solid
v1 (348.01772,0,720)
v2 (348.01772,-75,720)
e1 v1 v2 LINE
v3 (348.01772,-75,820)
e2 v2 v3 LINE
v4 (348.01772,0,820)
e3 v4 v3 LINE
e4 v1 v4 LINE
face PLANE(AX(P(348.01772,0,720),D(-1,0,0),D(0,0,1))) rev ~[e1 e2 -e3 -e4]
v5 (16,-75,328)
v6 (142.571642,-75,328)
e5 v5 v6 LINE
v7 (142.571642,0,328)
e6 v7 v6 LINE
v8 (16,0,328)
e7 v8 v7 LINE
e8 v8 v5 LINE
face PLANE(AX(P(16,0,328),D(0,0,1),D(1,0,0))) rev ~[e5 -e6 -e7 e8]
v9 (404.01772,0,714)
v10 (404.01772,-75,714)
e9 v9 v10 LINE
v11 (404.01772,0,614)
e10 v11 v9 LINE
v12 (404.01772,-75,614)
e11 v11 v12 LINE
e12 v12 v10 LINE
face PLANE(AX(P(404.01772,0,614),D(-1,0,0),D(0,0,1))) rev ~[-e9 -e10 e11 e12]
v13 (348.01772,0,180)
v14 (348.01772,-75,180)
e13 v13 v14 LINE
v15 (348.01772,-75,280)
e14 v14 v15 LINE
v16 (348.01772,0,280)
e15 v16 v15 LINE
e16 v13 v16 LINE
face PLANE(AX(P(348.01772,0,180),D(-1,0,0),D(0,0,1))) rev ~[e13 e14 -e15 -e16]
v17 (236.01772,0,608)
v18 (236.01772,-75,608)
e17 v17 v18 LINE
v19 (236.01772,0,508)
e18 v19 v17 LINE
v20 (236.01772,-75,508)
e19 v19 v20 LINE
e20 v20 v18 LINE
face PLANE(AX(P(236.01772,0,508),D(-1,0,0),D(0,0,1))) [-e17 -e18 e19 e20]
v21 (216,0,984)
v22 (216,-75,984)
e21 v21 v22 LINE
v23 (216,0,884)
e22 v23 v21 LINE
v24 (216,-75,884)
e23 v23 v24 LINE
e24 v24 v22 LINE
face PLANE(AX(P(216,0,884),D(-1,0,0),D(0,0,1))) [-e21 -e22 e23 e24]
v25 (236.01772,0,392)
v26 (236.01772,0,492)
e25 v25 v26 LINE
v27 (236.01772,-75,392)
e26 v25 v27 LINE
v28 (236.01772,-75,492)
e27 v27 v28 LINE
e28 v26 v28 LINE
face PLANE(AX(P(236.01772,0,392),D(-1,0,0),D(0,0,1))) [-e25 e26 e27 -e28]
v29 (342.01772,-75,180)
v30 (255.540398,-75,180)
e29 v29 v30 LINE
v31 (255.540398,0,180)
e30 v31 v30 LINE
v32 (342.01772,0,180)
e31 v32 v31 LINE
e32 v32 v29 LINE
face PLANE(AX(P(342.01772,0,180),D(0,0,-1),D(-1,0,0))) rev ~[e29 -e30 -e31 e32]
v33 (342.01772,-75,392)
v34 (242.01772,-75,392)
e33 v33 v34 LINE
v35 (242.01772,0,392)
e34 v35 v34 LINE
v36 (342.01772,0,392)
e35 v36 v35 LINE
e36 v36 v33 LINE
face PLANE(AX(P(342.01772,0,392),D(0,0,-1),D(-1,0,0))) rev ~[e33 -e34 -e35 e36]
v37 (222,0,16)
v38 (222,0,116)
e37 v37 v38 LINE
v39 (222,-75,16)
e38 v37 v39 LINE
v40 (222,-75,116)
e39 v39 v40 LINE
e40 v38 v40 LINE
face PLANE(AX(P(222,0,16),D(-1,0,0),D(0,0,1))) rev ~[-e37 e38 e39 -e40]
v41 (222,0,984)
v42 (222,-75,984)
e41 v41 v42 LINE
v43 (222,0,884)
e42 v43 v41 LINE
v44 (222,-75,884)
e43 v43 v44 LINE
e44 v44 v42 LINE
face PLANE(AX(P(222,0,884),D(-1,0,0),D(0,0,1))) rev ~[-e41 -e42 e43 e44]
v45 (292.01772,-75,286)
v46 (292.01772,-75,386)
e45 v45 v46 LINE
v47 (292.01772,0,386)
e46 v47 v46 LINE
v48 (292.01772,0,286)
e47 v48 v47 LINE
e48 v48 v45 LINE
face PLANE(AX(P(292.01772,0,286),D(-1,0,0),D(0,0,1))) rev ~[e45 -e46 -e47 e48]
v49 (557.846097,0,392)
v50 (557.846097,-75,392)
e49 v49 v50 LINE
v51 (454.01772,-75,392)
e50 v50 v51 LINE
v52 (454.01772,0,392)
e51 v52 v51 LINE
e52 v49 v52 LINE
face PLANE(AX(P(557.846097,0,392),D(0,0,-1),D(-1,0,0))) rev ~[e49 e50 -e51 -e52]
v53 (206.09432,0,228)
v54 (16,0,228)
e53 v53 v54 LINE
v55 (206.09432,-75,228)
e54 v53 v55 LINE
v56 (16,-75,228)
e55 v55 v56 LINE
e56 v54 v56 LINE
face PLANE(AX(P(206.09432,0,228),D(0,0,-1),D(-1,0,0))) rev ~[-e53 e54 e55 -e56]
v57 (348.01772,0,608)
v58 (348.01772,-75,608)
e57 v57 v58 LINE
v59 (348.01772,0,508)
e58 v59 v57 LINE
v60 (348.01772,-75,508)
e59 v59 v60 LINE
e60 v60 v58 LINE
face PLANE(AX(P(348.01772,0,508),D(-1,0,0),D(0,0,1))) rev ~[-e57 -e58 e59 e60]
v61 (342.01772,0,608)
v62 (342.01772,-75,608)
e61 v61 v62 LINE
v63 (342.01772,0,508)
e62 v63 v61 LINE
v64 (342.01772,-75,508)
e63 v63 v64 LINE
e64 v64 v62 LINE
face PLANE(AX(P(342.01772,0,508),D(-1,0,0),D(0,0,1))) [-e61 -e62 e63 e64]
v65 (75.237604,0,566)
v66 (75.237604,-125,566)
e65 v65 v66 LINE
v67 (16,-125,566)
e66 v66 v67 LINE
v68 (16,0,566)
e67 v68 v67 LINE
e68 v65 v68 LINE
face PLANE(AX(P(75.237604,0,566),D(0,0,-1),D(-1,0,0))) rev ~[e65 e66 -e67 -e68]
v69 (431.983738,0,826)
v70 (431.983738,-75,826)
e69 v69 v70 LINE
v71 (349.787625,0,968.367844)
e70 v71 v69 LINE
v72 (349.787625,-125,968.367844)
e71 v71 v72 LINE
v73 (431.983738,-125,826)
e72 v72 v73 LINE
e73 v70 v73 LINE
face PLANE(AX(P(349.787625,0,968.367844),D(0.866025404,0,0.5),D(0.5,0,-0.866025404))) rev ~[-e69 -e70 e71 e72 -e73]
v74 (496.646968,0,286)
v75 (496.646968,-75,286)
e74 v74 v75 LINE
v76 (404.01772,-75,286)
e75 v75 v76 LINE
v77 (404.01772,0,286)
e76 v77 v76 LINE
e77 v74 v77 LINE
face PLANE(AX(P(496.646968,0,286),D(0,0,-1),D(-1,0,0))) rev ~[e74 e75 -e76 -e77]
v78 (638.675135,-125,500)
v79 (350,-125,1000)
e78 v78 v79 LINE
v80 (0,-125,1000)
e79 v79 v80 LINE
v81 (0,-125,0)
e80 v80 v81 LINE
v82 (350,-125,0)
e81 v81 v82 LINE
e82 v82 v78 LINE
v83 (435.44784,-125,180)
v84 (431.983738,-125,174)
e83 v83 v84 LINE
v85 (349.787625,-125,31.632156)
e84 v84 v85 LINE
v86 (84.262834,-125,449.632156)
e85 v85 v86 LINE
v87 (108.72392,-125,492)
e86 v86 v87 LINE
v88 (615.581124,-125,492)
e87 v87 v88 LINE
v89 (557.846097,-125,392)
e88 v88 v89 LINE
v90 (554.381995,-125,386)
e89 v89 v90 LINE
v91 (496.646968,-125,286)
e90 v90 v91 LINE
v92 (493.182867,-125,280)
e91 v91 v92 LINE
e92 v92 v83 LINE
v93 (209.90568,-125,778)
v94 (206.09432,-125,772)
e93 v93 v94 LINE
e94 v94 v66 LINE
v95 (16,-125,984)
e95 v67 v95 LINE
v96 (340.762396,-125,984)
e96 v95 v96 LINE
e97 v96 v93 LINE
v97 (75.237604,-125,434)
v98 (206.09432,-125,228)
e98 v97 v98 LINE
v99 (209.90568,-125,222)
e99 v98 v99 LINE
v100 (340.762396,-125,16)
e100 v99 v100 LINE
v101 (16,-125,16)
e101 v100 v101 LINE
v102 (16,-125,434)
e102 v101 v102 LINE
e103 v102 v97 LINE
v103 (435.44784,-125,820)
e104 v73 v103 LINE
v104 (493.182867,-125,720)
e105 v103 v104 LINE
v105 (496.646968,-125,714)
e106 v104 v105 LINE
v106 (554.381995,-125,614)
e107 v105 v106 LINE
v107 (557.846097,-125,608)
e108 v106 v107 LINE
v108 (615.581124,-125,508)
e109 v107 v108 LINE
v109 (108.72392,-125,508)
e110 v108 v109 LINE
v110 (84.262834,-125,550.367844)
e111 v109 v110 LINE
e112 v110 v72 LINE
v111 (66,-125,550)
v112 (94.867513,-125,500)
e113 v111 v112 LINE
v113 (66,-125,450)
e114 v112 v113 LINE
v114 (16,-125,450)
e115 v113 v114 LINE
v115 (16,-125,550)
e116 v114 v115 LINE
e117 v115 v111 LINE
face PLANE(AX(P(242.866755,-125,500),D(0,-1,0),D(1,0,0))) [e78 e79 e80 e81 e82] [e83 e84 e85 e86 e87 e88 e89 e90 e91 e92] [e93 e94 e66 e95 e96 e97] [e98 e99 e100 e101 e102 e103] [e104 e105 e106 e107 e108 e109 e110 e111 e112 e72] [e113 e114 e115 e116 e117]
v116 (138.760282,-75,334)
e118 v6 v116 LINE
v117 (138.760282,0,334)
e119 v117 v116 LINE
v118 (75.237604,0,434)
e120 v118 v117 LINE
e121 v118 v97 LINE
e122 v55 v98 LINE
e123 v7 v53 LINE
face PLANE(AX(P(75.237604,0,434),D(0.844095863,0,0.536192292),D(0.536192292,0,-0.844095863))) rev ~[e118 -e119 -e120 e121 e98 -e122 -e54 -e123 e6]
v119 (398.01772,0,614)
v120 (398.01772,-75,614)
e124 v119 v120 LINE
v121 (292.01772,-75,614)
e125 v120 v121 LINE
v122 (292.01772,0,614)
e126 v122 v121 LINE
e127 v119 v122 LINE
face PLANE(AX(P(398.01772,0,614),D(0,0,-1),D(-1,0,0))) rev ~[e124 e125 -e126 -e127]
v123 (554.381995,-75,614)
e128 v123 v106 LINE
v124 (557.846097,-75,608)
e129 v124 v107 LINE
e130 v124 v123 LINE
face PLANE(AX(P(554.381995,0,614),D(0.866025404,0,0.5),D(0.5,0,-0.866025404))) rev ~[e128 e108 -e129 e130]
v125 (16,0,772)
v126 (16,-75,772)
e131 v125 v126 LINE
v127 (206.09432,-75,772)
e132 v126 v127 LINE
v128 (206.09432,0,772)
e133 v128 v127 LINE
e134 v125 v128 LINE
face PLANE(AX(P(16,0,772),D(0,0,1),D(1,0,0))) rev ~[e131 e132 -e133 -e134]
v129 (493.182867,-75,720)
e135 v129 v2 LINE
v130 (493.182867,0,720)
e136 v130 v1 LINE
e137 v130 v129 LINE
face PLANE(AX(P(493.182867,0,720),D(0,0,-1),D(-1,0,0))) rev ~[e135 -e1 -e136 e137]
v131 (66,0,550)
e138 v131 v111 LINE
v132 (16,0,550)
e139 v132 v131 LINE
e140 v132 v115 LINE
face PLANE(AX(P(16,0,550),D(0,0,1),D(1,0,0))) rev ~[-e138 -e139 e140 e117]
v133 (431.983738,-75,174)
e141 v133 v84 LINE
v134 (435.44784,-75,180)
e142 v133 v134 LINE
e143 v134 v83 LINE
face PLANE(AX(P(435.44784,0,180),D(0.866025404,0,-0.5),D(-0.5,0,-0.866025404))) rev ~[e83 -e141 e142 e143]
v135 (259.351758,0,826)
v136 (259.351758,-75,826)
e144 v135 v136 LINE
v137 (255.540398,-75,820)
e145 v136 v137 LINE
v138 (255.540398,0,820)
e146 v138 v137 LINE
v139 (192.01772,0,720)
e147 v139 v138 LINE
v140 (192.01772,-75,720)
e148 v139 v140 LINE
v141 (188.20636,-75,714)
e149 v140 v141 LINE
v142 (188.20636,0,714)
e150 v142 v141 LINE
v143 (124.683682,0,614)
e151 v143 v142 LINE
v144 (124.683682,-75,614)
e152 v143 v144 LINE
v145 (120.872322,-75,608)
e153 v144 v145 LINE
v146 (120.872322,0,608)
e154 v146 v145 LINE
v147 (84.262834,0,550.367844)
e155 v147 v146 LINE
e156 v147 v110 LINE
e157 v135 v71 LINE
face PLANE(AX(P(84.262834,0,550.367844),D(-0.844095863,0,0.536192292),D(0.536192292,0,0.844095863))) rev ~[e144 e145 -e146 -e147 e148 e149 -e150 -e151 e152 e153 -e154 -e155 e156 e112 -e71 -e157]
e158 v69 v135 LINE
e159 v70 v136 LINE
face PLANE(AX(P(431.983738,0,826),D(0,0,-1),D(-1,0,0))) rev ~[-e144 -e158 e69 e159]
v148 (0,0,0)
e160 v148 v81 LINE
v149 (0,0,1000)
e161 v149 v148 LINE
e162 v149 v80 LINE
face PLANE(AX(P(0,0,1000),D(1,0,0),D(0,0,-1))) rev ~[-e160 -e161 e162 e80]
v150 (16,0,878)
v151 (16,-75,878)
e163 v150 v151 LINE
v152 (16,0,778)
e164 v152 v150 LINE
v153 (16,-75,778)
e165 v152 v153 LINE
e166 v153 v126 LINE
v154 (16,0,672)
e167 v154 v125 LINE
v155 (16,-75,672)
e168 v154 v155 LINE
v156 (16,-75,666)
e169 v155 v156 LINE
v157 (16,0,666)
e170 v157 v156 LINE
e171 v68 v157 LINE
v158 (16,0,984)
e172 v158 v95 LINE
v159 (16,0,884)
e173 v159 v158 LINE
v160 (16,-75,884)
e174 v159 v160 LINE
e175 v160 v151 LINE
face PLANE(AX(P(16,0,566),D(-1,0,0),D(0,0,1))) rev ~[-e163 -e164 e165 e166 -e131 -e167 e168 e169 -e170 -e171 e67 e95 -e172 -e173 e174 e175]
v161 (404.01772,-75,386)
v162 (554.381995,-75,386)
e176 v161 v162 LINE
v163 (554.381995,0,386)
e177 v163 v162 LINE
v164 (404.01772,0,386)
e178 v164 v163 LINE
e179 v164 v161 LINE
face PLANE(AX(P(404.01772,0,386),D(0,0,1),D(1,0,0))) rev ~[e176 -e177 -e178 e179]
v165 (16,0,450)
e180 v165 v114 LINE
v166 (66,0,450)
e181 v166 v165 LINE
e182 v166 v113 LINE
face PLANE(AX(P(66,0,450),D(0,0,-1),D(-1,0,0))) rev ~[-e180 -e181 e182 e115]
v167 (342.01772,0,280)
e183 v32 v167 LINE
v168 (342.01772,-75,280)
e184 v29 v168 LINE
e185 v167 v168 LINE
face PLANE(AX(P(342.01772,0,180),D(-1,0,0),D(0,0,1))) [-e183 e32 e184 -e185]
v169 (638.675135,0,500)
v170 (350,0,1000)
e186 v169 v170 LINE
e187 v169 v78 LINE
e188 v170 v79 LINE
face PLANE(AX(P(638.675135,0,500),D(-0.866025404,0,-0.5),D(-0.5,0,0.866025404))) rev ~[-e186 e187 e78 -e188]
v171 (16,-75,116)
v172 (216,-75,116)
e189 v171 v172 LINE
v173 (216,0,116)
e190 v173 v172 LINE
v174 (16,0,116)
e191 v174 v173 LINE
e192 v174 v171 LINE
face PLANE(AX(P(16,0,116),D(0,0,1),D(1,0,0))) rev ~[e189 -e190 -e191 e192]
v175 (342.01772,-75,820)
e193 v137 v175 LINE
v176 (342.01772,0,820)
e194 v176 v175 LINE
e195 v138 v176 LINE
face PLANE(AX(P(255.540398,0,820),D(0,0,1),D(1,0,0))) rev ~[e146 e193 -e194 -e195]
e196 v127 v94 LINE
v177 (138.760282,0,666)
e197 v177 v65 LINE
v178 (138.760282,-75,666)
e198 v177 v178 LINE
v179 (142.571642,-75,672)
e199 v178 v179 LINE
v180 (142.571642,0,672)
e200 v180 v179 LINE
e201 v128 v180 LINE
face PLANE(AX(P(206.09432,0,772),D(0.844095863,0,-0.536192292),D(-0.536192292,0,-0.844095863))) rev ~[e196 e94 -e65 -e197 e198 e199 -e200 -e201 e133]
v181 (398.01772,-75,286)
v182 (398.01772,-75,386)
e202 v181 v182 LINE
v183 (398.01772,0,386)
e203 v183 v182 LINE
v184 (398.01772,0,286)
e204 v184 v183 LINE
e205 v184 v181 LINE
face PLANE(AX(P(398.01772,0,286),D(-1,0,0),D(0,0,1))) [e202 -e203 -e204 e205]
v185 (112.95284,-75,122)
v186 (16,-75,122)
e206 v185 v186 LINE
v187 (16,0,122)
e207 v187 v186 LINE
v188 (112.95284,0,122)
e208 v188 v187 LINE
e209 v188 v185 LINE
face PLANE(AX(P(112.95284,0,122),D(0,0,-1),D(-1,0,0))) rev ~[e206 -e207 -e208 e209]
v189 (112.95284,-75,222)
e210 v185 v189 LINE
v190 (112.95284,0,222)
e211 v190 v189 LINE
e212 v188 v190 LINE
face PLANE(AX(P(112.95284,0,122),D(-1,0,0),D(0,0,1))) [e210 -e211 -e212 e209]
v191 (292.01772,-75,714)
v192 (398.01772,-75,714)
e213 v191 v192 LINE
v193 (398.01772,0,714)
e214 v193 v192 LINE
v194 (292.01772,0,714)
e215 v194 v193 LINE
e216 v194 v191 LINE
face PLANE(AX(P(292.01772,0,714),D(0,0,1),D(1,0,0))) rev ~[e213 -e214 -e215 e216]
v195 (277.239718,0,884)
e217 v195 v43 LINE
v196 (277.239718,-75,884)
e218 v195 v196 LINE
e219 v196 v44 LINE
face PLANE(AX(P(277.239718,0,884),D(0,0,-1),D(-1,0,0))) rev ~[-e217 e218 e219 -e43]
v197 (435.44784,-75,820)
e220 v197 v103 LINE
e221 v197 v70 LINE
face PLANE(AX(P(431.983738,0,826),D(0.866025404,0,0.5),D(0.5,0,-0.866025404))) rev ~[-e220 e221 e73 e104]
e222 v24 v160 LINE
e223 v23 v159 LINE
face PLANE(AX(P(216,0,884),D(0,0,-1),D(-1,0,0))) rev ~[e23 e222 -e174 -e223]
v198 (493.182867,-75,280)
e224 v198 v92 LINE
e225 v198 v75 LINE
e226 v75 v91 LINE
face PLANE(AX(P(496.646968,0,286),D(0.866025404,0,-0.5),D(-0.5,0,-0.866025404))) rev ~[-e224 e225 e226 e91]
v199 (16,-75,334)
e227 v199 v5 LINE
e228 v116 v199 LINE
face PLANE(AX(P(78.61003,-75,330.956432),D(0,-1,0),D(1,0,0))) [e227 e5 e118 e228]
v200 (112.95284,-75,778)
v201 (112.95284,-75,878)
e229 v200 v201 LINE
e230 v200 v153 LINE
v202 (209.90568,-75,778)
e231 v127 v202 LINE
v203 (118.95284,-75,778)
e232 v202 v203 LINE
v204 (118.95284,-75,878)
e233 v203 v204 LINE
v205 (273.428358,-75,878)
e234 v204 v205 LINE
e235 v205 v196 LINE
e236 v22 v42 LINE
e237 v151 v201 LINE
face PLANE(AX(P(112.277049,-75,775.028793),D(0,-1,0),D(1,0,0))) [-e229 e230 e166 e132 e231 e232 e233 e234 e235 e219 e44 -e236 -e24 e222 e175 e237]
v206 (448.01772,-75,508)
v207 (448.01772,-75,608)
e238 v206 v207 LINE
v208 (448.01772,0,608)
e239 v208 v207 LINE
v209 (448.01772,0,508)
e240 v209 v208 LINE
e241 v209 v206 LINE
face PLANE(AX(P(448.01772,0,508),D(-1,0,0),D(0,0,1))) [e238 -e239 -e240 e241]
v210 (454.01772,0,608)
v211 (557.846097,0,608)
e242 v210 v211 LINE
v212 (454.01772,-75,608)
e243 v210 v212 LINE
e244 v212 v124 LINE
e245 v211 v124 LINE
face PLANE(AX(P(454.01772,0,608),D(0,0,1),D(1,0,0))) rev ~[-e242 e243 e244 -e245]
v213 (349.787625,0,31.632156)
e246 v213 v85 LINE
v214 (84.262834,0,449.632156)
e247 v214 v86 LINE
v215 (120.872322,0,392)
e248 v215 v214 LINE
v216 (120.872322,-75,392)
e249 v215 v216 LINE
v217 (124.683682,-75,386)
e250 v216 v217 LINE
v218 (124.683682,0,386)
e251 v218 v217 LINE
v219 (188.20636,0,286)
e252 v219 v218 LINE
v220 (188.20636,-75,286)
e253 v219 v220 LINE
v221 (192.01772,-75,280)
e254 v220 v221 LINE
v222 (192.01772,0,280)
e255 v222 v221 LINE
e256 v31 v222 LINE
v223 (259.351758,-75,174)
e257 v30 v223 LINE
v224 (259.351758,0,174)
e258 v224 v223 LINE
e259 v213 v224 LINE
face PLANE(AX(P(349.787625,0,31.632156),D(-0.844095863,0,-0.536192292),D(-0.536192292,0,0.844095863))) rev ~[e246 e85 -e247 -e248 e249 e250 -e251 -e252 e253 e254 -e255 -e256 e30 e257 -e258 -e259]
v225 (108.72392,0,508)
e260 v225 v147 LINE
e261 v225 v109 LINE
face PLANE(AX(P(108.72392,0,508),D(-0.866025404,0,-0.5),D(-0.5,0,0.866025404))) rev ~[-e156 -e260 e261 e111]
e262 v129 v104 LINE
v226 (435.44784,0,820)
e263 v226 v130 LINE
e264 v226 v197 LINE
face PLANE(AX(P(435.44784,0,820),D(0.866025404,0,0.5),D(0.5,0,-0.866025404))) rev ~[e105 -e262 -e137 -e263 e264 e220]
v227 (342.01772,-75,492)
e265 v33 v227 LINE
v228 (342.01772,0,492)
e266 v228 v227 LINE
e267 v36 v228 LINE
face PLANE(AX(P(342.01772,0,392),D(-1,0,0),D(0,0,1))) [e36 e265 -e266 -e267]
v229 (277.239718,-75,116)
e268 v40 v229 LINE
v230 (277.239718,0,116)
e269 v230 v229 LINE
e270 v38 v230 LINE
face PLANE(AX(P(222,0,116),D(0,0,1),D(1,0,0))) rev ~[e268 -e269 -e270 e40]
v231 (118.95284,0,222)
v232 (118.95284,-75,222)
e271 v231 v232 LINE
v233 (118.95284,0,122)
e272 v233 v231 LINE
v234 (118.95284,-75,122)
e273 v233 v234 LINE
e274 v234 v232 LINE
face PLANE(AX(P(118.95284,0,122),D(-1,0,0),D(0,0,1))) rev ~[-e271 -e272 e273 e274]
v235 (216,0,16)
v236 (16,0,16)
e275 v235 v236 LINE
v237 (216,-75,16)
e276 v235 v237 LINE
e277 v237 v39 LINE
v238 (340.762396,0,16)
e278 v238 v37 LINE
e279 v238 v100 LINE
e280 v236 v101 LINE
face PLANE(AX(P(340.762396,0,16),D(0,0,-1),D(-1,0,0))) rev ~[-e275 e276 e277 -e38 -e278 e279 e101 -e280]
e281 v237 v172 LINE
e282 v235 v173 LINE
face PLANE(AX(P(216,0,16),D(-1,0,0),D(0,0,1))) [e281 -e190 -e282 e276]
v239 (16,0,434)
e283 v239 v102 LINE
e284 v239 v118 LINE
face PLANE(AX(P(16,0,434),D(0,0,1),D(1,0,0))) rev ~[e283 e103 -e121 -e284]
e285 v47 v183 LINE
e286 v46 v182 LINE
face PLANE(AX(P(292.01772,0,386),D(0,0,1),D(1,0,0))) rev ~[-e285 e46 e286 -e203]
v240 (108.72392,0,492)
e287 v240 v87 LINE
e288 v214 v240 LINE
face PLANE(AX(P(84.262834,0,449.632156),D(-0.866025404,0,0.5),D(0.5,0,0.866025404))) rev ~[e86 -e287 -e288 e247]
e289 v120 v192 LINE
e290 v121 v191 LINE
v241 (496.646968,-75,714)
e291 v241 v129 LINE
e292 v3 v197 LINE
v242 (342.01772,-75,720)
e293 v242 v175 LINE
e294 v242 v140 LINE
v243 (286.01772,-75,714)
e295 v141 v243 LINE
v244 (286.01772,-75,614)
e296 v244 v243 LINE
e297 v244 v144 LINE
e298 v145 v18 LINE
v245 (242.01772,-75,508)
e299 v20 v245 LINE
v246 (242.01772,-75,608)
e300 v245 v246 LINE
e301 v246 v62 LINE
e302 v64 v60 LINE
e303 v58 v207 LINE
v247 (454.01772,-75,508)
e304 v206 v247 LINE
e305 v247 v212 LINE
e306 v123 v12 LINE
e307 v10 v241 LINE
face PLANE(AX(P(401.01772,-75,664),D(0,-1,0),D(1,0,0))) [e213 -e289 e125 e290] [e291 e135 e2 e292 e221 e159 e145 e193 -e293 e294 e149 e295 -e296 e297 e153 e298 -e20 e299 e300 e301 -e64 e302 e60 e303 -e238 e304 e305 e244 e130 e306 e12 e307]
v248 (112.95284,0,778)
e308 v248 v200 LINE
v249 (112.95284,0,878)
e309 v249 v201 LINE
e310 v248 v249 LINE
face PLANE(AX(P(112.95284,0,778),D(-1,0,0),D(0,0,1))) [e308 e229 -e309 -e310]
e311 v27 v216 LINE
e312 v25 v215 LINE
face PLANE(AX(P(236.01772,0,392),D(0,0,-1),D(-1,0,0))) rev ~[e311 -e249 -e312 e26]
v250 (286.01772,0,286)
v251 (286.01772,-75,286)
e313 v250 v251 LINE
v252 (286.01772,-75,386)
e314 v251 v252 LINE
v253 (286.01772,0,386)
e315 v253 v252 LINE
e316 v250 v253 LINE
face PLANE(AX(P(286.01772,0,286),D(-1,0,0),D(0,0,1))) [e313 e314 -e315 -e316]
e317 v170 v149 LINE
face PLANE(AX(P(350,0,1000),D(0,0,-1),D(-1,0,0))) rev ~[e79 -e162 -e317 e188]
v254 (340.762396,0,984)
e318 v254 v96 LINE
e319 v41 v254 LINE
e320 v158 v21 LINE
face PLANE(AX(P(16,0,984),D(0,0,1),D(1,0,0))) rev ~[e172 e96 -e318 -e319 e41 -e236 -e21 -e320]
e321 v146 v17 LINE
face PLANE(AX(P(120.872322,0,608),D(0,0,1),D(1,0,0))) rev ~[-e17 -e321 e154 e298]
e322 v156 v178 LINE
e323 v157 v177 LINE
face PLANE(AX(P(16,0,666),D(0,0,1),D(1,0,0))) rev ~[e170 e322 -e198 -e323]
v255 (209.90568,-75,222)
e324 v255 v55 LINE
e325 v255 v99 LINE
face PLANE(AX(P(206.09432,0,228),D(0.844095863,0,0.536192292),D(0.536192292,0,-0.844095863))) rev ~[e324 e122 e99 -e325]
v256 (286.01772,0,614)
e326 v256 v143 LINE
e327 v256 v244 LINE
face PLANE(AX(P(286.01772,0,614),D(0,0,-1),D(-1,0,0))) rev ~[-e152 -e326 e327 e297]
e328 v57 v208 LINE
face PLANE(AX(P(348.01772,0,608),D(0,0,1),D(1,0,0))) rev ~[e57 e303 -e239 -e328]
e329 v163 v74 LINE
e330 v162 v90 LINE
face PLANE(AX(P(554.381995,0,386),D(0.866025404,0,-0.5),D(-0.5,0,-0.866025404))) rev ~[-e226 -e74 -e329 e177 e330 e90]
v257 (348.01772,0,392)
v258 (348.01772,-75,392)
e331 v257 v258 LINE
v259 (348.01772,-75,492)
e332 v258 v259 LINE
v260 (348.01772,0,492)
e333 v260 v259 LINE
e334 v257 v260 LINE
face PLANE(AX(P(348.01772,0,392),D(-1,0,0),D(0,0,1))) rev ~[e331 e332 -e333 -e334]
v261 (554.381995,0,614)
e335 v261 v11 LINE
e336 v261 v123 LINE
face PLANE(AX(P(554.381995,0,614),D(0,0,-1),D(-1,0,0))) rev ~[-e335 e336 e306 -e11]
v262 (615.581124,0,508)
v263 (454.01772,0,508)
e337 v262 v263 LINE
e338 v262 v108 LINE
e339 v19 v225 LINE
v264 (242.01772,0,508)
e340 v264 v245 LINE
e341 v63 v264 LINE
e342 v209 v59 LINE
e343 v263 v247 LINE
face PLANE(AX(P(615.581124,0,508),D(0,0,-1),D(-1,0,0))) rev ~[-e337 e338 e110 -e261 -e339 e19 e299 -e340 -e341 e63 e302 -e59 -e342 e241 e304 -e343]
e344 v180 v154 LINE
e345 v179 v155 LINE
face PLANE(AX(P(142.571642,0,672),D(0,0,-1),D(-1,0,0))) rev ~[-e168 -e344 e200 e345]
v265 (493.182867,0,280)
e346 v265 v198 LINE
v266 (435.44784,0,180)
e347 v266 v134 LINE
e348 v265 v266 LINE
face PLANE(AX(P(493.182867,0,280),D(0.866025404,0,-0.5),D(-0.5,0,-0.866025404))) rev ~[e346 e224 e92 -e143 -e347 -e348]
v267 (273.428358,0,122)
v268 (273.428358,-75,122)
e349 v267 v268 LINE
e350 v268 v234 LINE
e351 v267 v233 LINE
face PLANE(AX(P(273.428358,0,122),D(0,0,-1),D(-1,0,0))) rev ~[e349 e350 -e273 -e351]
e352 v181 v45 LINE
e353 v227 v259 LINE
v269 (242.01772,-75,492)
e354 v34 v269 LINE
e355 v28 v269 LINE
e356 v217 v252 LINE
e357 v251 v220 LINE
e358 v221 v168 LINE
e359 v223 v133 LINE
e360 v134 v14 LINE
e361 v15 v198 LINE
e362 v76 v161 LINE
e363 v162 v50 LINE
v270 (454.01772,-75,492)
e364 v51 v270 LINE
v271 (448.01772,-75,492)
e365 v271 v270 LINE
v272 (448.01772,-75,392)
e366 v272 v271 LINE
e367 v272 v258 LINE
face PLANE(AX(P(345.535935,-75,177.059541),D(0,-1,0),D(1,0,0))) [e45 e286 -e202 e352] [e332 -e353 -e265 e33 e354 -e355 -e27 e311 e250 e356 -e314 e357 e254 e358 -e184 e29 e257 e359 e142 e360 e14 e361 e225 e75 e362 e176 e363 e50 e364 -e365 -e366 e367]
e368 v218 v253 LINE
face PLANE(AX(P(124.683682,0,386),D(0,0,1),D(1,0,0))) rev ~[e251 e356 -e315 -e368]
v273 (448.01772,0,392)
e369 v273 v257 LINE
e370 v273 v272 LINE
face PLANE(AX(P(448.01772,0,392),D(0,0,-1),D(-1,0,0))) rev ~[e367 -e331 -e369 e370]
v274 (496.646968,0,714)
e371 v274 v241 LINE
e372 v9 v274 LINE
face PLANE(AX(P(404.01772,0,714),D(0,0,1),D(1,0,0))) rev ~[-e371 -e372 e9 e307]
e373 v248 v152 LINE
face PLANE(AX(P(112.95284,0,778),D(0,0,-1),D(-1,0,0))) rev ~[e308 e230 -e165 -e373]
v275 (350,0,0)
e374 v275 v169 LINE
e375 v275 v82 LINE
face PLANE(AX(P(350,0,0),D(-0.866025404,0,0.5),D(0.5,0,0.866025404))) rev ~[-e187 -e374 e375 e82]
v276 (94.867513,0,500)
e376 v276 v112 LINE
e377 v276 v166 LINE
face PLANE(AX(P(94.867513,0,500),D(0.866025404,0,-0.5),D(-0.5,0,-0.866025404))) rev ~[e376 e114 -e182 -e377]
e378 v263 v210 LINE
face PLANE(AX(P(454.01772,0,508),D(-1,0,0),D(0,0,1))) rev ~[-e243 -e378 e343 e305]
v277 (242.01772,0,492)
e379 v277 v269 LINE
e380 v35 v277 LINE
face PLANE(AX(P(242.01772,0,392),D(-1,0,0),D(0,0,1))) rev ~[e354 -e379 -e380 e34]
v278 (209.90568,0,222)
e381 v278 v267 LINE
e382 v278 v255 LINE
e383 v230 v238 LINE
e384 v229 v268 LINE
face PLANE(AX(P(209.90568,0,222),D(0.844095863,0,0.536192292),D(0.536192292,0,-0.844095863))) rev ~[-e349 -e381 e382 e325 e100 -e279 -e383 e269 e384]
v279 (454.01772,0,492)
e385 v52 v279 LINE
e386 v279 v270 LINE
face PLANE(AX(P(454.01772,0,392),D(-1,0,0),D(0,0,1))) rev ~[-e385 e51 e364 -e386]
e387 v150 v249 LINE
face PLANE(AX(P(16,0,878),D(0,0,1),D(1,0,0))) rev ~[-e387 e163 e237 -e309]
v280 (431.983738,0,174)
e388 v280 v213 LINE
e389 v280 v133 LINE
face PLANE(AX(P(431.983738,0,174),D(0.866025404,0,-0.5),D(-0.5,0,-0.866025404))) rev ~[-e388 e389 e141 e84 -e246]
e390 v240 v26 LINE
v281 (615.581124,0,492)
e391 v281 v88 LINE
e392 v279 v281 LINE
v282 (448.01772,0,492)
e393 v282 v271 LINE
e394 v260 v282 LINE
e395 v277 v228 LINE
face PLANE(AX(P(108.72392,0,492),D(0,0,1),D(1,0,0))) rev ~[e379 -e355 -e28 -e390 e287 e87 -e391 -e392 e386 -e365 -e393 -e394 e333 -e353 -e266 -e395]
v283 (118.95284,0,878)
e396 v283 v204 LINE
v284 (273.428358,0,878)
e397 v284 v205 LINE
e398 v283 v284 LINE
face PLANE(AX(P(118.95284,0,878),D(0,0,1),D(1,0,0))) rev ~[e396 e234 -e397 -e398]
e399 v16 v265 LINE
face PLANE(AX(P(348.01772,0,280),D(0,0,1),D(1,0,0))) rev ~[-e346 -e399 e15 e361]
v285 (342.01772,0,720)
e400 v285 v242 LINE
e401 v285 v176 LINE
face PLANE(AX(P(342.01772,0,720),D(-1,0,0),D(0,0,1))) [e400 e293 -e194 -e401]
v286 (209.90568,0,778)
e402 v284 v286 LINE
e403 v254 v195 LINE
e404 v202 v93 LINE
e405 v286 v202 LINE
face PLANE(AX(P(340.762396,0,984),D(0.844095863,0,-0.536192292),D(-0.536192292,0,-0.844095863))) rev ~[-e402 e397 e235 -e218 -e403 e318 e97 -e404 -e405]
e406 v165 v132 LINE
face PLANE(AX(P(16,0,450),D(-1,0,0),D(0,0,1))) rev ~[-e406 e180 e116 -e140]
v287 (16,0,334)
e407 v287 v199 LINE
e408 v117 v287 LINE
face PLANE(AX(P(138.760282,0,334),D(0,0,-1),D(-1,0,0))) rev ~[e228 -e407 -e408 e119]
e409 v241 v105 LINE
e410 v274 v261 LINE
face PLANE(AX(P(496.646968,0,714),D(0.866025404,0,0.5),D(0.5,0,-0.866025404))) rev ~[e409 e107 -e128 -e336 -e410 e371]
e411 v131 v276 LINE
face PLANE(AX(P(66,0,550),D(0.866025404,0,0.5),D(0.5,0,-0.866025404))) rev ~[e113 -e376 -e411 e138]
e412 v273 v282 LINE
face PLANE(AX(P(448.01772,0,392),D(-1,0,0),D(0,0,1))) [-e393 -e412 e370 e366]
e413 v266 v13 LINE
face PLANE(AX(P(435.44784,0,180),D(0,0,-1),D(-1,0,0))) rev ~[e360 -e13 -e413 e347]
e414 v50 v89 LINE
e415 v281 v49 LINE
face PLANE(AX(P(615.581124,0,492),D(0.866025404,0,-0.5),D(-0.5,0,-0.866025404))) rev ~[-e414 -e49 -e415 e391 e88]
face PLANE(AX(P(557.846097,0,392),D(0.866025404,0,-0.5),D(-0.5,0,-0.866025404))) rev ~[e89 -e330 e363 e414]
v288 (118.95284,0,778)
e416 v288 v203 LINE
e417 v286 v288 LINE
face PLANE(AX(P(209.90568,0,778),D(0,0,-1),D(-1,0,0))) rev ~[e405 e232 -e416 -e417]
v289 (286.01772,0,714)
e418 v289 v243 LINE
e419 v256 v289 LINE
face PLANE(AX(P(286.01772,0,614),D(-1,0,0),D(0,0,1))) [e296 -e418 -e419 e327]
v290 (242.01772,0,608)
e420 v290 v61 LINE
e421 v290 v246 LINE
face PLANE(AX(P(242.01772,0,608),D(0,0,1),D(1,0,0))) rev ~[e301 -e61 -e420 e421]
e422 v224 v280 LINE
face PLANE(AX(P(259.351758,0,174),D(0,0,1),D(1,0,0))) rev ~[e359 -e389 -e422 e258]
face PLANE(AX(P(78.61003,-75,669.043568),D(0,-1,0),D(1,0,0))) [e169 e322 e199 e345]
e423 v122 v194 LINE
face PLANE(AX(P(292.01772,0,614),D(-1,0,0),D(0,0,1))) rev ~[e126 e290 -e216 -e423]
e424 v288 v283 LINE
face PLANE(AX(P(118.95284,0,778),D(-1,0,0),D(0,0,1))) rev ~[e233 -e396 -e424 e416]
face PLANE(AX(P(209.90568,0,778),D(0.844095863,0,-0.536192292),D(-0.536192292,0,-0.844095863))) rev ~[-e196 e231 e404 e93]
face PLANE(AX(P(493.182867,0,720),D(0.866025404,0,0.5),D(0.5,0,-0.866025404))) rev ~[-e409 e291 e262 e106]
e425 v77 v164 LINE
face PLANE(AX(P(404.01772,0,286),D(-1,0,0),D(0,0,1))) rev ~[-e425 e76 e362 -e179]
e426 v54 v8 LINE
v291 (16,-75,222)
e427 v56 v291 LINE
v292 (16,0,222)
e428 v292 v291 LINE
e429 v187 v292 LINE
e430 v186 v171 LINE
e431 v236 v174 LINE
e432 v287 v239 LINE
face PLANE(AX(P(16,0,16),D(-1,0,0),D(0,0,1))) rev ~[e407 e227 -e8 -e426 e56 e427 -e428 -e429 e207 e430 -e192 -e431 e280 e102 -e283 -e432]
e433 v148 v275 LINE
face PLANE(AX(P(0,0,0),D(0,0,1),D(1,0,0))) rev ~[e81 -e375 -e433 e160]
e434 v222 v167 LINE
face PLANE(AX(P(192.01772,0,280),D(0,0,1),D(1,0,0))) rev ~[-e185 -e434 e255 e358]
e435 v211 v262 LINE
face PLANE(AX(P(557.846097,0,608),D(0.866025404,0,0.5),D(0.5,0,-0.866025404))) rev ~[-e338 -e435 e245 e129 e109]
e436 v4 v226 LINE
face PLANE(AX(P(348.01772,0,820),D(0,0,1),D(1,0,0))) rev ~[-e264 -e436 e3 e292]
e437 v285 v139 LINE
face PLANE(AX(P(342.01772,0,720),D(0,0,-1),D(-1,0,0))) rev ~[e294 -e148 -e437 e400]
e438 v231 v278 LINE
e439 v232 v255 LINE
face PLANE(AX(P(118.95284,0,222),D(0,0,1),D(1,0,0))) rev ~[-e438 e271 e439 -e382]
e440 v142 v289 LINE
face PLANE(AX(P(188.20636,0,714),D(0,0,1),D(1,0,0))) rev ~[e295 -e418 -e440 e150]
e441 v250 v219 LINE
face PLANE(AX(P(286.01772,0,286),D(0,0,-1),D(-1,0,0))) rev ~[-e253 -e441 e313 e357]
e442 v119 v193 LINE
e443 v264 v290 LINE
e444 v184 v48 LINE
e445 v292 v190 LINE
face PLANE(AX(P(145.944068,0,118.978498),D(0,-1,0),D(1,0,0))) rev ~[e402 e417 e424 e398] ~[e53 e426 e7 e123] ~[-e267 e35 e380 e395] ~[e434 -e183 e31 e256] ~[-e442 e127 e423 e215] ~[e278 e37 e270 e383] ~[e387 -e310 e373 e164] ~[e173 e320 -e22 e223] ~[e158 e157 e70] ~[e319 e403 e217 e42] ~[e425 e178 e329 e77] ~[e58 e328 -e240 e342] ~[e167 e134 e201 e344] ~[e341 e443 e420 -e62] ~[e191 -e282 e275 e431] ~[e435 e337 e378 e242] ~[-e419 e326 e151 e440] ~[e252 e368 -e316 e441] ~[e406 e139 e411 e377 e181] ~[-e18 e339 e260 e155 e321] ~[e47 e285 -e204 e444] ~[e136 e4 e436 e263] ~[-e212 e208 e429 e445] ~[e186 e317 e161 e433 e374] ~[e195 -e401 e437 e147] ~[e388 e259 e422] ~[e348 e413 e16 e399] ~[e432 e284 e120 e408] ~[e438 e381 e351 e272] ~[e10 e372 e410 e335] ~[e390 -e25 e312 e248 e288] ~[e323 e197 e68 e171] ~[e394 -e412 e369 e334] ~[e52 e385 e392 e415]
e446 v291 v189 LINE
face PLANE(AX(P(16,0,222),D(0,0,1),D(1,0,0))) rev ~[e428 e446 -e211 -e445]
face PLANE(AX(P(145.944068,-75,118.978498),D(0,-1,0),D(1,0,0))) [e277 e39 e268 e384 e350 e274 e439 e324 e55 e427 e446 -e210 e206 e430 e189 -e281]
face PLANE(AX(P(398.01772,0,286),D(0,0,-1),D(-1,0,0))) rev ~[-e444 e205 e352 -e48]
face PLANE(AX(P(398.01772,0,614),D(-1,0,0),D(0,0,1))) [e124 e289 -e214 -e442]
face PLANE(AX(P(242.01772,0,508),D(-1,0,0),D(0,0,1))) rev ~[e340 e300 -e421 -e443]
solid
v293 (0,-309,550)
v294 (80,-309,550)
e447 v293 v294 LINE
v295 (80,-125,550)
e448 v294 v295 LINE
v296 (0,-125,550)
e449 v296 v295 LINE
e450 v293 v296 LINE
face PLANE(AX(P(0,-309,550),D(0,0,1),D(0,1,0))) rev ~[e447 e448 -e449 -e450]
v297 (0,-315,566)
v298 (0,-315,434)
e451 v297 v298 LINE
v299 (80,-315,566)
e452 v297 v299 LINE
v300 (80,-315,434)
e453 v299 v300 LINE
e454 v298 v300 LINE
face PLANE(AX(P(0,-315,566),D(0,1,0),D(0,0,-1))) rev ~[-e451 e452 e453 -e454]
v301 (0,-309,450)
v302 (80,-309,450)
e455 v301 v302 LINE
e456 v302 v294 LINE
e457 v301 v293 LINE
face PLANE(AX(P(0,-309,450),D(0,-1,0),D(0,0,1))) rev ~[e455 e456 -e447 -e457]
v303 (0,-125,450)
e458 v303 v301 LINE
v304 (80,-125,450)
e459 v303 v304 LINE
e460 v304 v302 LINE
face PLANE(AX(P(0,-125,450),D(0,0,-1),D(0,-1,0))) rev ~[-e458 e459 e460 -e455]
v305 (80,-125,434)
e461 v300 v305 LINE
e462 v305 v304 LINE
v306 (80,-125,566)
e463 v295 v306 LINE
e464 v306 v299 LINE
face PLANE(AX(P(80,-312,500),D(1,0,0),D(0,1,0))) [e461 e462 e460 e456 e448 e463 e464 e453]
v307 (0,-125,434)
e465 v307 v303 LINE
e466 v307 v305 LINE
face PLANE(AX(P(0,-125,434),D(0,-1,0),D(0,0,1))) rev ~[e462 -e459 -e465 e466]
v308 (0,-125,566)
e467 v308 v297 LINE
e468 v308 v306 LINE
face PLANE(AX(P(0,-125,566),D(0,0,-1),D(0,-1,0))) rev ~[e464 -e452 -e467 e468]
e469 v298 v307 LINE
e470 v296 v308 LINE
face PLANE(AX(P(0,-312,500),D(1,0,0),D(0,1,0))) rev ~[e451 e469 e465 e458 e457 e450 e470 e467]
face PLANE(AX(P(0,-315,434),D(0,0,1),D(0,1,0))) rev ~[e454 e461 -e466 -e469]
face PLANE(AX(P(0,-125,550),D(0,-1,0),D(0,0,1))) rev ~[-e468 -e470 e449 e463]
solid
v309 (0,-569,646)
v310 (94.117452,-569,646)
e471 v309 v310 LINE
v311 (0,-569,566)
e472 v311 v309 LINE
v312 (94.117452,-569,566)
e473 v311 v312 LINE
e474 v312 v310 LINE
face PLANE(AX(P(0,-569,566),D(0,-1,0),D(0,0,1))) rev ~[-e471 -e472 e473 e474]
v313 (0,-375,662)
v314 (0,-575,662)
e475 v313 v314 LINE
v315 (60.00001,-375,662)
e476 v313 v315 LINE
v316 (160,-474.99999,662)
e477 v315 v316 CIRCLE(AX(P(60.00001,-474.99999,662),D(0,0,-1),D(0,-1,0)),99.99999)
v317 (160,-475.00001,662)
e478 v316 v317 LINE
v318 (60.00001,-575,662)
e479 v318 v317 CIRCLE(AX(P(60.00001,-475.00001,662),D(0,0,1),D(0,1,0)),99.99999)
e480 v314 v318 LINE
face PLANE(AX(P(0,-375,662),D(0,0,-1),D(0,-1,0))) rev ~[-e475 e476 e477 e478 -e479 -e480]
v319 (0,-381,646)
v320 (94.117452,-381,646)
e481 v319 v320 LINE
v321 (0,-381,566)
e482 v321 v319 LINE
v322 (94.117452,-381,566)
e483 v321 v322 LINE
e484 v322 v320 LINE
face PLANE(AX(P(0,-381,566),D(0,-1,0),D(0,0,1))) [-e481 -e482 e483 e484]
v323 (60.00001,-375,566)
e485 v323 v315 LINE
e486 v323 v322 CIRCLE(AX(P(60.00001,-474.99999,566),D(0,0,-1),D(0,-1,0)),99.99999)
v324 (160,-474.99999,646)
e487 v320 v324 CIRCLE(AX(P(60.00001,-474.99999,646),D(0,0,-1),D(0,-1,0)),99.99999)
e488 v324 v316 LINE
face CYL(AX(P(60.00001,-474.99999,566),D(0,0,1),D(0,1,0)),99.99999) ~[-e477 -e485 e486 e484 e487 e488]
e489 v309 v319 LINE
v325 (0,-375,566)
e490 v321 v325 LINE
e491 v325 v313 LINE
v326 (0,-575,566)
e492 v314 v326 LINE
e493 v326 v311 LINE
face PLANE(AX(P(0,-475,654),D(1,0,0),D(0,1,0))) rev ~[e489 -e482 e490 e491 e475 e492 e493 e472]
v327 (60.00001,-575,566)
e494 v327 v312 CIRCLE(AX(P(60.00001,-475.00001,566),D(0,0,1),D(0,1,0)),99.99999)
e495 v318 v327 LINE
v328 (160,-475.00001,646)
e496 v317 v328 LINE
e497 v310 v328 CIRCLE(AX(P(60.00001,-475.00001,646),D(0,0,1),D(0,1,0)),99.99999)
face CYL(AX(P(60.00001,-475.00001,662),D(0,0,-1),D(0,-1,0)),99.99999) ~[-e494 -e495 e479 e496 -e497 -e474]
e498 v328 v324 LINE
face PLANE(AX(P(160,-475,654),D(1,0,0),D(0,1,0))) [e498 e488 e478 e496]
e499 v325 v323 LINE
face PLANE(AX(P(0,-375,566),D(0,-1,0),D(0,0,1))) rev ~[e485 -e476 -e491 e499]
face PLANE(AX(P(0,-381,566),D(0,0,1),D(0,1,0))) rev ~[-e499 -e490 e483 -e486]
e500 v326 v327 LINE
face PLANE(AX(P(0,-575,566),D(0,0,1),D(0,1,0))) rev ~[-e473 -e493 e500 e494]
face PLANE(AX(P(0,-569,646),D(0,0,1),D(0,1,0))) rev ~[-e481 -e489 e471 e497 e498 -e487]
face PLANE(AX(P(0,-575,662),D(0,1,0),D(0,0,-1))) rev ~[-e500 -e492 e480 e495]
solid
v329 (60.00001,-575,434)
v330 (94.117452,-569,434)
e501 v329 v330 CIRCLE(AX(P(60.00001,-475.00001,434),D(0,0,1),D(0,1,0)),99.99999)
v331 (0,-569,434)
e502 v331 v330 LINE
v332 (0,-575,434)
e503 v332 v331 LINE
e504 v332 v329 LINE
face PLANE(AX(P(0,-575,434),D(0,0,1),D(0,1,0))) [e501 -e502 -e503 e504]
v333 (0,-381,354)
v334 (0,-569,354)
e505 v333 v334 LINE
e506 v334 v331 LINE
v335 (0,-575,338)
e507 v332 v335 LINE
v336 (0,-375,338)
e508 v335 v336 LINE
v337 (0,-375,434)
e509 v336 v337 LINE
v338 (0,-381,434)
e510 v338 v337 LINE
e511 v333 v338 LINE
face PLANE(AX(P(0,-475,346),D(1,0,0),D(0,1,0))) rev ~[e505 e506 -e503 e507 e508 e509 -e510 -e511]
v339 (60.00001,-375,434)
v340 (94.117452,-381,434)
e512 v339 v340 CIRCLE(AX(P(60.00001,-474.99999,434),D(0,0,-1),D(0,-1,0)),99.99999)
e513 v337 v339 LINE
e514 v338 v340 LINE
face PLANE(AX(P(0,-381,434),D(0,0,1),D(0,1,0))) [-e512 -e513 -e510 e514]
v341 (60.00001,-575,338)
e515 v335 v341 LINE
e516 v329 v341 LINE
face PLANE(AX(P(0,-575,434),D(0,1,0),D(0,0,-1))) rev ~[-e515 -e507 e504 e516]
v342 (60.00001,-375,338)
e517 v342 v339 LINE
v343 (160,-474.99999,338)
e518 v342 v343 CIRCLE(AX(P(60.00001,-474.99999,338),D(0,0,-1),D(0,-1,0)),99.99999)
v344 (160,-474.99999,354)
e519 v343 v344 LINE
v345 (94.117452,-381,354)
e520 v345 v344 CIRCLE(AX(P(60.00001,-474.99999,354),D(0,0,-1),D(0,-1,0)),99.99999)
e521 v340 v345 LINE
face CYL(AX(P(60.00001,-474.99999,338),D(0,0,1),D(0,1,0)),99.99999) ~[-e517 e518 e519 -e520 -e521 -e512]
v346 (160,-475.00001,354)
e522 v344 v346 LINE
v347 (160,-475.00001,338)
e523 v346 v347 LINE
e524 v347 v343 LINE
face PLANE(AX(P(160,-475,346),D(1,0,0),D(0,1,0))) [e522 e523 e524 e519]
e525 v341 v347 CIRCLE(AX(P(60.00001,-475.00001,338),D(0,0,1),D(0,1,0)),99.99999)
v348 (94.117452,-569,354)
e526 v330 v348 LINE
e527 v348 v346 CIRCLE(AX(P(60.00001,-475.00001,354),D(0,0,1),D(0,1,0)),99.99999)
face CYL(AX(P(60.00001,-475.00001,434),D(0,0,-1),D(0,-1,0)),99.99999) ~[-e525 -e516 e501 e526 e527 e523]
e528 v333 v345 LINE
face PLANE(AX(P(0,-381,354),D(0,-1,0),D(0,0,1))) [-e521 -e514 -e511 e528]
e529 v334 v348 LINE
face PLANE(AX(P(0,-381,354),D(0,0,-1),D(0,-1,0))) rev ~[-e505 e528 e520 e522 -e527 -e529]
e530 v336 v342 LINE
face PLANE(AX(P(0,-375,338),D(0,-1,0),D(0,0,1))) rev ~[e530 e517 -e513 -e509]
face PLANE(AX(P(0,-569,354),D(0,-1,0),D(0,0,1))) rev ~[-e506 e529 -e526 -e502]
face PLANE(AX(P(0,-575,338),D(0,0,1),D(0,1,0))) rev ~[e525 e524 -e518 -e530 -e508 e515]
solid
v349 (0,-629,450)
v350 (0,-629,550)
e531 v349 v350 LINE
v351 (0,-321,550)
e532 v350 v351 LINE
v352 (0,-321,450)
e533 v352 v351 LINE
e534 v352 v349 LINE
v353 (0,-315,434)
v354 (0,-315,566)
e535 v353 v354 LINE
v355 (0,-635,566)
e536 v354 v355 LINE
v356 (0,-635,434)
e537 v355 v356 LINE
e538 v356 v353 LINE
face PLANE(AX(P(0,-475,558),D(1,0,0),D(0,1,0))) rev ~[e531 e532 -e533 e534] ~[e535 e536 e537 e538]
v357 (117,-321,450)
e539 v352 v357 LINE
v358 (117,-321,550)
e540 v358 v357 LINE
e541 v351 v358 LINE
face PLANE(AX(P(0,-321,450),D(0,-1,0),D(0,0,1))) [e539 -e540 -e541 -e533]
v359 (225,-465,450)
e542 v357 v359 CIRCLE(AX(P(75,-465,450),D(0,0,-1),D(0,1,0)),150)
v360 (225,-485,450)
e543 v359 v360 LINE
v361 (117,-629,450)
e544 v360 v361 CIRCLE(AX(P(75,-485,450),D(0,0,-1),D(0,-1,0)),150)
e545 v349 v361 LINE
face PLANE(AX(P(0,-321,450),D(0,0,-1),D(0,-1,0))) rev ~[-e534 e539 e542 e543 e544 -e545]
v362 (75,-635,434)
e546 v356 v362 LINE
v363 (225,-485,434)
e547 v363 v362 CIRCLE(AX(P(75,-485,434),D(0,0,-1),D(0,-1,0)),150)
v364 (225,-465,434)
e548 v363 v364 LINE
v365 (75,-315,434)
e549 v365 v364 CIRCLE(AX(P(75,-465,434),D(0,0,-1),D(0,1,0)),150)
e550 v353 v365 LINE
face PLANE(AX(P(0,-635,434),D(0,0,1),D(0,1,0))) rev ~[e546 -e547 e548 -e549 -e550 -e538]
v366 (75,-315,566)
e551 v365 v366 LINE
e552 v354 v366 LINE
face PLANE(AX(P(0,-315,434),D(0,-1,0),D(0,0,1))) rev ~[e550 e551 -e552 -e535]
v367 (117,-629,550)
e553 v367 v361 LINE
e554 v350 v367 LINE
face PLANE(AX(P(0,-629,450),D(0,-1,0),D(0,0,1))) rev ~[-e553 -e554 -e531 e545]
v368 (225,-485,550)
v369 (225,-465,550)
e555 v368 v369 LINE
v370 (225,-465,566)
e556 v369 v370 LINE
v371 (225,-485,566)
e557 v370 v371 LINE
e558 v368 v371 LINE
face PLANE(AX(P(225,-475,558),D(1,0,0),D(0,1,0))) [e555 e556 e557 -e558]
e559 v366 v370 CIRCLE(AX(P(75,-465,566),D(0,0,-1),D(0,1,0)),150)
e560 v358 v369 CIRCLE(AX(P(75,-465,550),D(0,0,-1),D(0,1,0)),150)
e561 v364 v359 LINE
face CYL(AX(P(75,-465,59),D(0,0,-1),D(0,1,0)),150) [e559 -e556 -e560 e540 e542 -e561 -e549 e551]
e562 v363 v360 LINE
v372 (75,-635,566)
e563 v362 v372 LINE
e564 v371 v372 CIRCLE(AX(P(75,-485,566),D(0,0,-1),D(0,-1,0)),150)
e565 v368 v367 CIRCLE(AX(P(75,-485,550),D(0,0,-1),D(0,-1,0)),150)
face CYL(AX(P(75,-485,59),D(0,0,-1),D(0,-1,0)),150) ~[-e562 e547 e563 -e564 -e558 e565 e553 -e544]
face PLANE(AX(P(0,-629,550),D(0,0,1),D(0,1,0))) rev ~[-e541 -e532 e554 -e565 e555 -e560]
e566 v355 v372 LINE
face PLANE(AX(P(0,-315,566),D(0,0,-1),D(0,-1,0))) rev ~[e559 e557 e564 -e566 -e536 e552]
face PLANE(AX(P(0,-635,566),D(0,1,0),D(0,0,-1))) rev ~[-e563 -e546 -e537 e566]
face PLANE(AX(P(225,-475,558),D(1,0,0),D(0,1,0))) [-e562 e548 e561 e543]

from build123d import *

# Parameters (mm, degrees)
F2_DEPTH    = 125
F1_W        = 6
F1_H        = 100
F3_DEPTH    = 75
F4_W        = 6
F4_H        = 80
F5_DEPTH    = 160
F4_H_2      = 100
F6_DEPTH    = 80
F7_R        = 99.99999
F7_2_R      = 99.99999
F8_DEPTH    = 225
F9_T1_DEPTH = 882


# Not quite as in the source:
# - a fillet or chamfer that OpenCascade refuses, or shapes differently, is made with other operations: its cross-section is extruded or revolved along the edge and cut away or added
# - a fillet or chamfer is up to 0.001 mm smaller than in the source, because OpenCascade refuses the exact size
# - a feature names something its author has since deleted; it is built from what else it names


with BuildPart() as f2:
    # F1 (on Front) → F2 (new body)
    with BuildSketch(Plane.XZ):
        Polygon((0, 1000), (0, 0), (350, 0), (638.6751345948, 500), (350, 1000), align=None)
        Polygon((16, 884), (16, 984), (216, 984), (222, 984), (340.762395693, 984), (349.7876249334, 968.3678444056), (431.9837382249, 826), (435.4478398401, 820), (493.182866759, 720), (496.6469683742, 714), (554.3819952931, 614), (557.8460969083, 608), (615.5811238272, 508), (620.1999259807, 500), (615.5811238272, 492), (557.8460969083, 392), (554.3819952931, 386), (496.6469683742, 286), (493.182866759, 280), (435.4478398401, 180), (431.9837382249, 174), (349.7876249334, 31.6321555944), (340.762395693, 16), (222, 16), (216, 16), (16, 16), (16, 116), (16, 122), (16, 222), (16, 228), (16, 328), (16, 334), (16, 434), (16, 450), (16, 550), (16, 566), (16, 666), (16, 672), (16, 772), (16, 778), (16, 878), align=None, mode=Mode.SUBTRACT)
        Polygon((236.0177204531, 508), (108.72391992, 508), (113.3427220735, 500), (108.72391992, 492), (236.0177204531, 492), (242.0177204531, 492), (342.0177204531, 492), (348.0177204531, 492), (448.0177204531, 492), (454.0177204531, 492), (615.5811238272, 492), (620.1999259807, 500), (615.5811238272, 508), (454.0177204531, 508), (448.0177204531, 508), (348.0177204531, 508), (342.0177204531, 508), (242.0177204531, 508), align=None)
        Polygon((84.2628335475, 449.6321555944), (75.237604307, 434), (138.7602816721, 334), (142.571642314, 328), (206.094319679, 228), (209.905680321, 222), (273.428357686, 122), (277.2397183279, 116), (340.762395693, 16), (349.7876249334, 31.6321555944), (259.3517584601, 174), (255.5403978182, 180), (192.0177204531, 280), (188.2063598112, 286), (124.6836824461, 386), (120.8723218042, 392), align=None)
        Polygon((349.7876249334, 968.3678444056), (340.762395693, 984), (277.2397183279, 884), (273.428357686, 878), (209.905680321, 778), (206.094319679, 772), (142.571642314, 672), (138.7602816721, 666), (75.237604307, 566), (84.2628335475, 550.3678444056), (120.8723218042, 608), (124.6836824461, 614), (188.2063598112, 714), (192.0177204531, 720), (255.5403978182, 820), (259.3517584601, 826), align=None)
        Polygon((75.237604307, 566), (16, 566), (16, 550), (66, 550), (94.8675134595, 500), (66, 450), (16, 450), (16, 434), (75.237604307, 434), (84.2628335475, 449.6321555944), (108.72391992, 492), (113.3427220735, 500), (108.72391992, 508), (84.2628335475, 550.3678444056), align=None)
    extrude(amount=F2_DEPTH)

    # F1 (on Front) → F3 (join)
    with BuildSketch(Plane.XZ):
        Polygon((112.9528401605, 122), (16, 122), (16, 116), (216, 116), (222, 116), (277.2397183279, 116), (273.428357686, 122), (118.9528401605, 122), align=None)
        with Locations((219, 66)):
            Rectangle(F1_W, F1_H)
        with Locations((115.9528401605, 172)):
            Rectangle(F1_W, F1_H)
        Polygon((206.094319679, 228), (16, 228), (16, 222), (112.9528401605, 222), (118.9528401605, 222), (209.905680321, 222), align=None)
        Polygon((138.7602816721, 334), (16, 334), (16, 328), (142.571642314, 328), align=None)
        Polygon((342.0177204531, 180), (255.5403978182, 180), (259.3517584601, 174), (431.9837382249, 174), (435.4478398401, 180), (348.0177204531, 180), align=None)
        with Locations((345.0177204531, 230)):
            Rectangle(F1_W, F1_H)
        Polygon((286.0177204531, 286), (188.2063598112, 286), (192.0177204531, 280), (342.0177204531, 280), (348.0177204531, 280), (493.182866759, 280), (496.6469683742, 286), (404.0177204531, 286), (398.0177204531, 286), (292.0177204531, 286), align=None)
        with Locations((289.0177204531, 336)):
            Rectangle(F1_W, F1_H)
        with Locations((401.0177204531, 336)):
            Rectangle(F1_W, F1_H)
        Polygon((236.0177204531, 392), (120.8723218042, 392), (124.6836824461, 386), (286.0177204531, 386), (292.0177204531, 386), (398.0177204531, 386), (404.0177204531, 386), (554.3819952931, 386), (557.8460969083, 392), (454.0177204531, 392), (448.0177204531, 392), (348.0177204531, 392), (342.0177204531, 392), (242.0177204531, 392), align=None)
        with Locations((345.0177204531, 442)):
            Rectangle(F1_W, F1_H)
        with Locations((239.0177204531, 442)):
            Rectangle(F1_W, F1_H)
        with Locations((451.0177204531, 442)):
            Rectangle(F1_W, F1_H)
        with Locations((401.0177204531, 664)):
            Rectangle(F1_W, F1_H)
        Polygon((496.6469683742, 714), (493.182866759, 720), (348.0177204531, 720), (342.0177204531, 720), (192.0177204531, 720), (188.2063598112, 714), (286.0177204531, 714), (292.0177204531, 714), (398.0177204531, 714), (404.0177204531, 714), align=None)
        with Locations((345.0177204531, 770)):
            Rectangle(F1_W, F1_H)
        Polygon((557.8460969083, 608), (554.3819952931, 614), (404.0177204531, 614), (398.0177204531, 614), (292.0177204531, 614), (286.0177204531, 614), (124.6836824461, 614), (120.8723218042, 608), (236.0177204531, 608), (242.0177204531, 608), (342.0177204531, 608), (348.0177204531, 608), (448.0177204531, 608), (454.0177204531, 608), align=None)
        with Locations((451.0177204531, 558)):
            Rectangle(F1_W, F1_H)
        with Locations((239.0177204531, 558)):
            Rectangle(F1_W, F1_H)
        with Locations((345.0177204531, 558)):
            Rectangle(F1_W, F1_H)
        Polygon((142.571642314, 672), (16, 672), (16, 666), (138.7602816721, 666), align=None)
        Polygon((112.9528401605, 778), (16, 778), (16, 772), (206.094319679, 772), (209.905680321, 778), (118.9528401605, 778), align=None)
        with Locations((115.9528401605, 828)):
            Rectangle(F1_W, F1_H)
        Polygon((216, 884), (16, 884), (16, 878), (112.9528401605, 878), (118.9528401605, 878), (273.428357686, 878), (277.2397183279, 884), (222, 884), align=None)
        with Locations((219, 934)):
            Rectangle(F1_W, F1_H)
        Polygon((435.4478398401, 820), (431.9837382249, 826), (259.3517584601, 826), (255.5403978182, 820), (342.0177204531, 820), (348.0177204531, 820), align=None)
        with Locations((289.0177204531, 664)):
            Rectangle(F1_W, F1_H)
    extrude(amount=F3_DEPTH)


with BuildPart() as f5:
    # F4 (on Right) → F5 (new body)
    with BuildSketch(Plane.YZ):
        Polygon((-381, 646), (-375, 646), (-375, 662), (-575, 662), (-575, 646), (-569, 646), align=None)
        with Locations((-572, 606)):
            Rectangle(F4_W, F4_H)
        with Locations((-378, 606)):
            Rectangle(F4_W, F4_H)
    extrude(amount=F5_DEPTH)

    # F7 (radius 100 in the source; OpenCascade refuses exactly that, so slightly less here)
    f7_edges = [f5.edges().sort_by_distance(p)[0] for p in [
        (160, -375, 614),
        (160, -575, 614),
    ]]
    fillet(f7_edges, radius=F7_R)


with BuildPart() as f5b:
    # F4 (on Right) → F5, piece 2 (new body)
    with BuildSketch(Plane.YZ):
        Polygon((-375, 338), (-375, 354), (-381, 354), (-569, 354), (-575, 354), (-575, 338), align=None)
        with Locations((-378, 394)):
            Rectangle(F4_W, F4_H)
        with Locations((-572, 394)):
            Rectangle(F4_W, F4_H)
    extrude(amount=F5_DEPTH)

    # F7#2 (radius 100 in the source; OpenCascade refuses exactly that, so slightly less here)
    f7_2_edges = [f5b.edges().sort_by_distance(p)[0] for p in [
        (160, -375, 386),
        (160, -575, 386),
    ]]
    fillet(f7_2_edges, radius=F7_2_R)


with BuildPart() as f6:
    # F4 (on Right) → F6 (new body)
    with BuildSketch(Plane.YZ):
        with Locations((-312, 500)):
            Rectangle(F4_W, F4_H_2)
        Polygon((-309, 550), (-125, 550), (-125, 566), (-315, 566), (-315, 550), align=None)
        Polygon((-125, 450), (-309, 450), (-315, 450), (-315, 434), (-125, 434), align=None)
    extrude(amount=F6_DEPTH)


with BuildPart() as f8:
    # F4 (on Right) → F8 (new body)
    with BuildSketch(Plane.YZ):
        Polygon((-321, 550), (-315, 550), (-315, 566), (-375, 566), (-381, 566), (-569, 566), (-575, 566), (-635, 566), (-635, 550), (-629, 550), align=None)
        with Locations((-632, 500)):
            Rectangle(F4_W, F4_H_2)
        Polygon((-315, 434), (-315, 450), (-321, 450), (-629, 450), (-635, 450), (-635, 434), (-575, 434), (-569, 434), (-381, 434), (-375, 434), align=None)
        with Locations((-318, 500)):
            Rectangle(F4_W, F4_H_2)
    extrude(amount=F8_DEPTH)

    # F9: fillet of radius 150 on 2 edges, made by hand

    # F9_s2 → F9_t1 (cut)
    with BuildSketch(Plane.XY.offset(59)):
        with BuildLine():
            ThreePointArc((75, -635), (181.066017178, -591.066017178), (225, -485))
            Line((225, -485), (225, -635))
            Line((225, -635), (75, -635))
        make_face()
        with BuildLine():
            ThreePointArc((75, -315), (181.066017178, -358.933982822), (225, -465))
            Line((225, -465), (225, -315))
            Line((225, -315), (75, -315))
        make_face()
    extrude(amount=F9_T1_DEPTH, mode=Mode.SUBTRACT)


solid = Compound([f2.part, f5.part, f5b.part, f6.part, f8.part])
